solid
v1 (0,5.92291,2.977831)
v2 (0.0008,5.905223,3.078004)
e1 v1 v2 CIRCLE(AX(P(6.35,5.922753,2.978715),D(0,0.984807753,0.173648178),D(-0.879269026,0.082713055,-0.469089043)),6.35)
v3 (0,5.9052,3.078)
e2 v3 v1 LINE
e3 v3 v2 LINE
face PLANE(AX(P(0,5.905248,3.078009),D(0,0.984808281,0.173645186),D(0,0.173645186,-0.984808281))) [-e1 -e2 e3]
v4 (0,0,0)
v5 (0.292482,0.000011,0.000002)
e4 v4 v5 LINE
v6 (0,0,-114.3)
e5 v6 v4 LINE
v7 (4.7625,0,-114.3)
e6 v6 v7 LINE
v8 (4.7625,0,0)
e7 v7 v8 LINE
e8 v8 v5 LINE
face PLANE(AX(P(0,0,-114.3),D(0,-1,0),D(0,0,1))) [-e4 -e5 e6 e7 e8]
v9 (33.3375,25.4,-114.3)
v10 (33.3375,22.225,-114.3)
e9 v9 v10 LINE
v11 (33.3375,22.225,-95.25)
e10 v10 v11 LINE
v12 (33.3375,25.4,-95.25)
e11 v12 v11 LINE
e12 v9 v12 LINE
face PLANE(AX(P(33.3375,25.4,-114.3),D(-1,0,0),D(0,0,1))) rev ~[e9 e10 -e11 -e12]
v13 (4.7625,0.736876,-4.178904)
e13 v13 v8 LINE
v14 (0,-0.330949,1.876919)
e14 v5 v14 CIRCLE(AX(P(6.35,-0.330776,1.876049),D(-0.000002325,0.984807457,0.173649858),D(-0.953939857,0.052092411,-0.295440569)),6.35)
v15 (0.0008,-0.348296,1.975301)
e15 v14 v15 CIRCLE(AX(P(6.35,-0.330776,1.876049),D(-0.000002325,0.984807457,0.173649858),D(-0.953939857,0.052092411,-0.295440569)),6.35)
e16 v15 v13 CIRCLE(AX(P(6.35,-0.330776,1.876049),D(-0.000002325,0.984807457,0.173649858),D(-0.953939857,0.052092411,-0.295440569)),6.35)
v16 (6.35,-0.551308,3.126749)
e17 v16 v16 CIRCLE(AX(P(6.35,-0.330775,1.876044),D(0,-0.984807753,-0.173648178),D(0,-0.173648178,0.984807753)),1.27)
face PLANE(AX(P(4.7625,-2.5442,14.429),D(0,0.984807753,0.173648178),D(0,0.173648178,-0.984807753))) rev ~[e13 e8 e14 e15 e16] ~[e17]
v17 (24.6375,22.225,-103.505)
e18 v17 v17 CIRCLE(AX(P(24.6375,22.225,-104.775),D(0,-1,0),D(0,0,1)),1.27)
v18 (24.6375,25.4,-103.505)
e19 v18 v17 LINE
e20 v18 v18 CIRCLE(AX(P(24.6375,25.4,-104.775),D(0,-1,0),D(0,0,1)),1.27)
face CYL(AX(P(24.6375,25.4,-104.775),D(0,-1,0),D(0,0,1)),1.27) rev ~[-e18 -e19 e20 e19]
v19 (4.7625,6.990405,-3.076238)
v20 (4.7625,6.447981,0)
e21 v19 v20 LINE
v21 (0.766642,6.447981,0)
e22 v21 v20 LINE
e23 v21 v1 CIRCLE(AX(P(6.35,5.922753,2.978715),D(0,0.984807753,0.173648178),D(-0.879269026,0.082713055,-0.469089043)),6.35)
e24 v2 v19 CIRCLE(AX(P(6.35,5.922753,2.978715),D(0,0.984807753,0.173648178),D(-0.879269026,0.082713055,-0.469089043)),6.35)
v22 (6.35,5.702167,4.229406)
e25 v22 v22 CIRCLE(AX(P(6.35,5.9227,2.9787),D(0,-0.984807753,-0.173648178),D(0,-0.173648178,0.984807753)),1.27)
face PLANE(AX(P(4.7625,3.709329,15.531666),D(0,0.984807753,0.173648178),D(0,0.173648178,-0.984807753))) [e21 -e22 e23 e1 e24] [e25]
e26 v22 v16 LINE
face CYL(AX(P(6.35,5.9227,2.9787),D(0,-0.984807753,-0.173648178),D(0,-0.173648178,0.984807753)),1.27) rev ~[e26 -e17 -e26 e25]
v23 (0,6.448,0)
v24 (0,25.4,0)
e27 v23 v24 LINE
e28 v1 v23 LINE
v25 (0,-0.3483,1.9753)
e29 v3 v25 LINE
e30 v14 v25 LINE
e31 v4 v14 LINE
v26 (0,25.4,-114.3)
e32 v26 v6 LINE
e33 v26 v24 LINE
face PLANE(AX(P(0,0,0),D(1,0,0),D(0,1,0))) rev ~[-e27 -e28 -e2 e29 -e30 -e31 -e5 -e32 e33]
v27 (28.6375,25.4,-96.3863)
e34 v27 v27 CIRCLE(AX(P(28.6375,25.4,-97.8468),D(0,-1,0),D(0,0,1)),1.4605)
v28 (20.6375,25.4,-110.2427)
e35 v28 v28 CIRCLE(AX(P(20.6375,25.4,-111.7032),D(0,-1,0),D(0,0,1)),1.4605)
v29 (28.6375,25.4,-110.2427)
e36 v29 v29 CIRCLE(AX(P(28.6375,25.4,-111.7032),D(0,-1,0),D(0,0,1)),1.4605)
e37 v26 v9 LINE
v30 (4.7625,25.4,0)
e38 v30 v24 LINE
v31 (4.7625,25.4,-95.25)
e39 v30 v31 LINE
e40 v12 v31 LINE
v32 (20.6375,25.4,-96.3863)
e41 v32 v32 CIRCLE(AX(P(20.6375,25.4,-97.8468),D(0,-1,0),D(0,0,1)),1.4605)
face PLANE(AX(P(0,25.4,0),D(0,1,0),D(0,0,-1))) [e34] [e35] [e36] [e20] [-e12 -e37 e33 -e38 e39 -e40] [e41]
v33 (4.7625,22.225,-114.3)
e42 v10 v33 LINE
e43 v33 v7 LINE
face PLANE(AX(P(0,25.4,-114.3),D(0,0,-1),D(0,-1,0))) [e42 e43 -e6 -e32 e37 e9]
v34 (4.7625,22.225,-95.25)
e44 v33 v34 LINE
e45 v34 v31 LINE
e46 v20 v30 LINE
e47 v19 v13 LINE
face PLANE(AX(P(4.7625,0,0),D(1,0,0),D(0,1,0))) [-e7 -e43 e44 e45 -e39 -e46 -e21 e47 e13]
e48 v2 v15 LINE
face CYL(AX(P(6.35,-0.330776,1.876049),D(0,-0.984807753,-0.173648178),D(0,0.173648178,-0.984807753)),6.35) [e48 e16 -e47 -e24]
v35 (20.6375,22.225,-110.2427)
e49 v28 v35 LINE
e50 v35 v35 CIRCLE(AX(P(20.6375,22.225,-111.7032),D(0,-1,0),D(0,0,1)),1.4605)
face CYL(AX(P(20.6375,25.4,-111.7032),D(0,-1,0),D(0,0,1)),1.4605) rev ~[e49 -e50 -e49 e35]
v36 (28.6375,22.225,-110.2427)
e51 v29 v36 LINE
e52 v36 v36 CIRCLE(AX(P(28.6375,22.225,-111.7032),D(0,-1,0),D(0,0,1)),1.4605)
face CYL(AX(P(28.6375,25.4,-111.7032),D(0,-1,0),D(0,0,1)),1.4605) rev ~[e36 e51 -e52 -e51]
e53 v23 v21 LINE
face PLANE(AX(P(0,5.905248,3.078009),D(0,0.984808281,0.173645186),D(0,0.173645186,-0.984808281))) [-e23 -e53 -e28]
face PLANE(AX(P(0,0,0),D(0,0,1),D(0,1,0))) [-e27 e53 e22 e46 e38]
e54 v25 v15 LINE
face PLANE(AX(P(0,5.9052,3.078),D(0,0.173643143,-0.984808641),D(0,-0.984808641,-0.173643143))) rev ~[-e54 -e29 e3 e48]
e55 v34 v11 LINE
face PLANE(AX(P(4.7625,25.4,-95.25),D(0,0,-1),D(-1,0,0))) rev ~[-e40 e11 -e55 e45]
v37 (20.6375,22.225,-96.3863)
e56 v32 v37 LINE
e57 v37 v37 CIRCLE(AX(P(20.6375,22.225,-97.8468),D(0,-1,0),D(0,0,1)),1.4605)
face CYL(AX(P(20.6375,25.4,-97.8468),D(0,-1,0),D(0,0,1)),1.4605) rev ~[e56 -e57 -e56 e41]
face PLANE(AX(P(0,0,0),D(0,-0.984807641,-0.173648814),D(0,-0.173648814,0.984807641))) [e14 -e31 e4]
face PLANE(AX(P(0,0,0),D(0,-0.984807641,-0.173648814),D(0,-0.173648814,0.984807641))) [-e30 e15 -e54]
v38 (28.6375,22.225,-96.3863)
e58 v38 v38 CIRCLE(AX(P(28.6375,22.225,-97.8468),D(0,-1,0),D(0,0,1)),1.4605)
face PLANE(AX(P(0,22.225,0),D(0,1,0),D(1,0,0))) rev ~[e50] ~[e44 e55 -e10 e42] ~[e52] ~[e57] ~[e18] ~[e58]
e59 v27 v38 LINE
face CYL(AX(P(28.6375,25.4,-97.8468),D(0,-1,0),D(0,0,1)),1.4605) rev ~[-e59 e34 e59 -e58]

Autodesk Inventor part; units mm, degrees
ref_plane "YZ Plane" through (0, 0, 0) normal (1, 0, 0) x (0, 1, 0)
ref_plane "XZ Plane" through (0, 0, 0) normal (0, 1, 0) x (-1, 0, 0)
ref_plane "XY Plane" through (0, 0, 0) normal (0, 0, 1) x (1, 0, 0)
sketch "Sketch2" plane through (0, 0, 0) normal (1, 0, 0) x (0, 1, 0)
  line L0 (0, 0) -> (25.4, 0)
  line L1 (25.4, 0) -> (25.4, -114.3)
  line L2 (25.4, -114.3) -> (0, -114.3)
  line L3 (0, -114.3) -> (0, 0)
  dimension "d6" = 25.4
  dimension "d7" = 114.3
extrude "Extrusion2" add sketch "Sketch2" along normal blind 4.7625
sketch "Sketch3" plane through (4.7625, 0, 0) normal (1, 0, 0) x (0, 0, -1)
  line L0 (0, 0) -> (114.3, 0) projected
  line L1 (0, 0) -> (-14.429, -2.5442)
  line L2 (0, 0) -> (14.6516, 0) construction
  dimension "d10" = 170
ref_plane "Work Plane1" through (4.7625, -2.5442, 14.429) normal (0, 0.9848078, 0.1736482) x (0, 0.1736482, -0.9848078)
sketch "Sketch4" plane through (4.7625, -2.5442, 14.429) normal (0, 0.9848078, 0.1736482) x (0, 0.1736482, -0.9848078)
  line L0 (127.2151, 4.7625) -> (14.6516, 4.7625) projected
  line L1 (127.2151, 4.7625) -> (127.2151, 0) projected
  line L2 (14.6516, 0) -> (127.2151, 0) projected
  line L3 (14.6516, 4.7625) -> (14.6516, 0) projected
  line L4 (14.6516, 4.7625) -> (14.6516, 0)
  circle A0 centre (12.7466, -1.5875) radius 6.35
  dimension "d28" = 12.7
  dimension "d29" = 4.7625
  dimension "d30" = 1.5875
  dimension "d40" = 1.905
sketch "Sketch5" plane through (0, 25.4, 0) normal (0, 1, 0) x (1, 0, 0)
  line L0 (0, 0) -> (0, 114.3) projected
  line L1 (0, 0) -> (4.7625, 0) projected
  line L2 (4.7625, 114.3) -> (4.7625, 0) projected
  line L3 (0, 114.3) -> (4.7625, 114.3) projected
  line L4 (0, 114.3) -> (0, 0) projected
  line L5 (0, 114.3) -> (33.3375, 114.3)
  line L6 (33.3375, 114.3) -> (33.3375, 95.25)
  line L7 (33.3375, 95.25) -> (0, 95.25)
  line L8 (0, 95.25) -> (0, 114.3)
  dimension "d47" = 33.3375
  dimension "d48" = 4.7625
  dimension "d49" = 19.05
extrude "Extrusion4" add sketch "Sketch5" against normal blind 3.175 contours L0 L3 L2 L7 | L2 L5 L6 L7
extrude "Extrusion6" add sketch "Sketch4" along normal blind 6.35 contours A0 L2 L3 | L3 L2 A0
sketch "Sketch10" plane through (0, 0, 0) normal (-1, 0, 0) x (0, 0, 1)
  line L0 (0, 25.4) -> (-114.3, 25.4) projected
  line L1 (-114.3, 25.4) -> (-114.3, 0) projected
  line L2 (-114.3, 0) -> (0, 0) projected
  line L3 (0, 0) -> (0, 25.4) projected
  line L4 (-3.0762, 6.9904) -> (-4.1789, 0.7369) projected
  line L5 (0, 6.448) -> (-3.0762, 6.9904) projected
  line L6 (0, 0) -> (0, 6.448) projected
  line L7 (-4.1789, 0.7369) -> (0, 0) projected
  line L8 (9.2323, 4.8201) -> (-3.2748, 7.0254) projected
  line L9 (8.1296, -1.4335) -> (9.2323, 4.8201) projected
  line L10 (3.078, 5.9052) -> (1.5105, -2.9848)
  line L11 (3.078, 5.9052) -> (12.1052, 5.9052) construction
  line L12 (-114.3, 0) -> (0, 0) projected
  line L13 (3.078, 5.9052) -> (0, 6.448)
  line L14 (0, 0) -> (0, 25.4) projected
  line L15 (0, 0) -> (0, 6.448)
  line L16 (0, 0) -> (1.9753, -0.3483)
  line L17 (5.253, -0.9262) -> (-1.5008, 0.2646) projected
  line L18 (0, 0) -> (4.9253, -0.8685)
  point P0 (-1.1172, 0.197)
  dimension "d41" = 12.3085
  dimension "d42" = 6.1542
  dimension "d43" = 100
  dimension "d44" = 8.89
extrude "Extrusion9" add sketch "Sketch10" against normal blind 2.54
sketch "Sketch11" plane through (0, 25.4, 0) normal (0, 1, 0) x (1, 0, 0)
  line L0 (0, 0) -> (4.7625, 0) projected
  line L1 (4.7625, 95.25) -> (4.7625, 0) projected
  line L2 (4.7625, 95.25) -> (33.3375, 95.25) projected
  line L3 (33.3375, 95.25) -> (33.3375, 114.3) projected
  line L4 (0, 114.3) -> (33.3375, 114.3) projected
  line L5 (0, 0) -> (0, 114.3) projected
  circle A0 centre (24.6375, 104.775) radius 8
  line L6 (20.6375, 111.7032) -> (28.6375, 111.7032)
  line L7 (28.6375, 111.7032) -> (28.6375, 97.8468)
  line L8 (28.6375, 97.8468) -> (20.6375, 97.8468)
  line L9 (20.6375, 97.8468) -> (20.6375, 111.7032)
  point P0 (0, 0)
  dimension "d50" = 16
  dimension "d53" = 19.05
  dimension "d54" = 28.575
  dimension "d55" = 9.525
  dimension "d56" = 8
  dimension "d57" = 4
  dimension "d58" = 15.875
hole "Hole1" at (20.6375, 25.4, -111.7032) at (28.6375, 25.4, -111.7032) at (28.6375, 25.4, -97.8468) at (20.6375, 25.4, -97.8468) direction (0, -1, 0) diameter 2.921 end through all
sketch "Sketch12" plane through (0, 25.4, 0) normal (0, 1, 0) x (1, 0, 0)
  circle A0 centre (28.6375, 97.8468) radius 1.4605 projected
  circle A1 centre (20.6375, 111.7032) radius 1.4605 projected
  circle A2 centre (28.6375, 111.7032) radius 1.4605 projected
  circle A3 centre (20.6375, 97.8468) radius 1.4605 projected
  line L0 (0, 0) -> (4.7625, 0) projected
  line L1 (4.7625, 95.25) -> (4.7625, 0) projected
  line L2 (4.7625, 95.25) -> (33.3375, 95.25) projected
  line L3 (33.3375, 95.25) -> (33.3375, 114.3) projected
  line L4 (0, 114.3) -> (33.3375, 114.3) projected
  line L5 (0, 0) -> (0, 114.3) projected
  circle A4 centre (28.6375, 97.8468) radius 1.4605 projected
  arc A5 (20.6375, 111.7032) -> (28.6375, 111.7032) centre (24.6375, 104.775) ccw
  point P0 (0, 0)
hole "Hole2" at (24.6375, 25.4, -104.775) direction (0, -1, 0) diameter 2.54 end through all
sketch "Sketch13" plane through (4.7625, 3.7093, 15.5317) normal (0, 0.9848078, 0.1736482) x (1, 0, 0)
  line L0 (-4.7625, 15.7713) -> (0, 15.7713) projected
  line L1 (-4.7625, 12.6458) -> (-4.7625, 15.7713) projected
  line L2 (-4.7625, 12.6458) -> (-4.7617, 12.6458) projected
  arc A0 (-4.7617, 12.6458) -> (0, 18.8949) centre (1.5875, 12.7466) ccw projected
  line L3 (0, 15.7713) -> (0, 18.8949) projected
  point P0 (-4.7625, 14.6516)
hole "Hole3" at (6.35, 5.9227, 2.9787) direction (0, -0.9848078, -0.1736482) diameter 2.54 end through all
equation "\"d30\" = 0.5 * d28 - d29"
equation "\"d42\" = 0.5 * d41"
equation "\"d55\" = 0.5 * d53"
equation "\"d57\" = 0.5 * d56"
properties part number "WheelIntakeMotorMount"
